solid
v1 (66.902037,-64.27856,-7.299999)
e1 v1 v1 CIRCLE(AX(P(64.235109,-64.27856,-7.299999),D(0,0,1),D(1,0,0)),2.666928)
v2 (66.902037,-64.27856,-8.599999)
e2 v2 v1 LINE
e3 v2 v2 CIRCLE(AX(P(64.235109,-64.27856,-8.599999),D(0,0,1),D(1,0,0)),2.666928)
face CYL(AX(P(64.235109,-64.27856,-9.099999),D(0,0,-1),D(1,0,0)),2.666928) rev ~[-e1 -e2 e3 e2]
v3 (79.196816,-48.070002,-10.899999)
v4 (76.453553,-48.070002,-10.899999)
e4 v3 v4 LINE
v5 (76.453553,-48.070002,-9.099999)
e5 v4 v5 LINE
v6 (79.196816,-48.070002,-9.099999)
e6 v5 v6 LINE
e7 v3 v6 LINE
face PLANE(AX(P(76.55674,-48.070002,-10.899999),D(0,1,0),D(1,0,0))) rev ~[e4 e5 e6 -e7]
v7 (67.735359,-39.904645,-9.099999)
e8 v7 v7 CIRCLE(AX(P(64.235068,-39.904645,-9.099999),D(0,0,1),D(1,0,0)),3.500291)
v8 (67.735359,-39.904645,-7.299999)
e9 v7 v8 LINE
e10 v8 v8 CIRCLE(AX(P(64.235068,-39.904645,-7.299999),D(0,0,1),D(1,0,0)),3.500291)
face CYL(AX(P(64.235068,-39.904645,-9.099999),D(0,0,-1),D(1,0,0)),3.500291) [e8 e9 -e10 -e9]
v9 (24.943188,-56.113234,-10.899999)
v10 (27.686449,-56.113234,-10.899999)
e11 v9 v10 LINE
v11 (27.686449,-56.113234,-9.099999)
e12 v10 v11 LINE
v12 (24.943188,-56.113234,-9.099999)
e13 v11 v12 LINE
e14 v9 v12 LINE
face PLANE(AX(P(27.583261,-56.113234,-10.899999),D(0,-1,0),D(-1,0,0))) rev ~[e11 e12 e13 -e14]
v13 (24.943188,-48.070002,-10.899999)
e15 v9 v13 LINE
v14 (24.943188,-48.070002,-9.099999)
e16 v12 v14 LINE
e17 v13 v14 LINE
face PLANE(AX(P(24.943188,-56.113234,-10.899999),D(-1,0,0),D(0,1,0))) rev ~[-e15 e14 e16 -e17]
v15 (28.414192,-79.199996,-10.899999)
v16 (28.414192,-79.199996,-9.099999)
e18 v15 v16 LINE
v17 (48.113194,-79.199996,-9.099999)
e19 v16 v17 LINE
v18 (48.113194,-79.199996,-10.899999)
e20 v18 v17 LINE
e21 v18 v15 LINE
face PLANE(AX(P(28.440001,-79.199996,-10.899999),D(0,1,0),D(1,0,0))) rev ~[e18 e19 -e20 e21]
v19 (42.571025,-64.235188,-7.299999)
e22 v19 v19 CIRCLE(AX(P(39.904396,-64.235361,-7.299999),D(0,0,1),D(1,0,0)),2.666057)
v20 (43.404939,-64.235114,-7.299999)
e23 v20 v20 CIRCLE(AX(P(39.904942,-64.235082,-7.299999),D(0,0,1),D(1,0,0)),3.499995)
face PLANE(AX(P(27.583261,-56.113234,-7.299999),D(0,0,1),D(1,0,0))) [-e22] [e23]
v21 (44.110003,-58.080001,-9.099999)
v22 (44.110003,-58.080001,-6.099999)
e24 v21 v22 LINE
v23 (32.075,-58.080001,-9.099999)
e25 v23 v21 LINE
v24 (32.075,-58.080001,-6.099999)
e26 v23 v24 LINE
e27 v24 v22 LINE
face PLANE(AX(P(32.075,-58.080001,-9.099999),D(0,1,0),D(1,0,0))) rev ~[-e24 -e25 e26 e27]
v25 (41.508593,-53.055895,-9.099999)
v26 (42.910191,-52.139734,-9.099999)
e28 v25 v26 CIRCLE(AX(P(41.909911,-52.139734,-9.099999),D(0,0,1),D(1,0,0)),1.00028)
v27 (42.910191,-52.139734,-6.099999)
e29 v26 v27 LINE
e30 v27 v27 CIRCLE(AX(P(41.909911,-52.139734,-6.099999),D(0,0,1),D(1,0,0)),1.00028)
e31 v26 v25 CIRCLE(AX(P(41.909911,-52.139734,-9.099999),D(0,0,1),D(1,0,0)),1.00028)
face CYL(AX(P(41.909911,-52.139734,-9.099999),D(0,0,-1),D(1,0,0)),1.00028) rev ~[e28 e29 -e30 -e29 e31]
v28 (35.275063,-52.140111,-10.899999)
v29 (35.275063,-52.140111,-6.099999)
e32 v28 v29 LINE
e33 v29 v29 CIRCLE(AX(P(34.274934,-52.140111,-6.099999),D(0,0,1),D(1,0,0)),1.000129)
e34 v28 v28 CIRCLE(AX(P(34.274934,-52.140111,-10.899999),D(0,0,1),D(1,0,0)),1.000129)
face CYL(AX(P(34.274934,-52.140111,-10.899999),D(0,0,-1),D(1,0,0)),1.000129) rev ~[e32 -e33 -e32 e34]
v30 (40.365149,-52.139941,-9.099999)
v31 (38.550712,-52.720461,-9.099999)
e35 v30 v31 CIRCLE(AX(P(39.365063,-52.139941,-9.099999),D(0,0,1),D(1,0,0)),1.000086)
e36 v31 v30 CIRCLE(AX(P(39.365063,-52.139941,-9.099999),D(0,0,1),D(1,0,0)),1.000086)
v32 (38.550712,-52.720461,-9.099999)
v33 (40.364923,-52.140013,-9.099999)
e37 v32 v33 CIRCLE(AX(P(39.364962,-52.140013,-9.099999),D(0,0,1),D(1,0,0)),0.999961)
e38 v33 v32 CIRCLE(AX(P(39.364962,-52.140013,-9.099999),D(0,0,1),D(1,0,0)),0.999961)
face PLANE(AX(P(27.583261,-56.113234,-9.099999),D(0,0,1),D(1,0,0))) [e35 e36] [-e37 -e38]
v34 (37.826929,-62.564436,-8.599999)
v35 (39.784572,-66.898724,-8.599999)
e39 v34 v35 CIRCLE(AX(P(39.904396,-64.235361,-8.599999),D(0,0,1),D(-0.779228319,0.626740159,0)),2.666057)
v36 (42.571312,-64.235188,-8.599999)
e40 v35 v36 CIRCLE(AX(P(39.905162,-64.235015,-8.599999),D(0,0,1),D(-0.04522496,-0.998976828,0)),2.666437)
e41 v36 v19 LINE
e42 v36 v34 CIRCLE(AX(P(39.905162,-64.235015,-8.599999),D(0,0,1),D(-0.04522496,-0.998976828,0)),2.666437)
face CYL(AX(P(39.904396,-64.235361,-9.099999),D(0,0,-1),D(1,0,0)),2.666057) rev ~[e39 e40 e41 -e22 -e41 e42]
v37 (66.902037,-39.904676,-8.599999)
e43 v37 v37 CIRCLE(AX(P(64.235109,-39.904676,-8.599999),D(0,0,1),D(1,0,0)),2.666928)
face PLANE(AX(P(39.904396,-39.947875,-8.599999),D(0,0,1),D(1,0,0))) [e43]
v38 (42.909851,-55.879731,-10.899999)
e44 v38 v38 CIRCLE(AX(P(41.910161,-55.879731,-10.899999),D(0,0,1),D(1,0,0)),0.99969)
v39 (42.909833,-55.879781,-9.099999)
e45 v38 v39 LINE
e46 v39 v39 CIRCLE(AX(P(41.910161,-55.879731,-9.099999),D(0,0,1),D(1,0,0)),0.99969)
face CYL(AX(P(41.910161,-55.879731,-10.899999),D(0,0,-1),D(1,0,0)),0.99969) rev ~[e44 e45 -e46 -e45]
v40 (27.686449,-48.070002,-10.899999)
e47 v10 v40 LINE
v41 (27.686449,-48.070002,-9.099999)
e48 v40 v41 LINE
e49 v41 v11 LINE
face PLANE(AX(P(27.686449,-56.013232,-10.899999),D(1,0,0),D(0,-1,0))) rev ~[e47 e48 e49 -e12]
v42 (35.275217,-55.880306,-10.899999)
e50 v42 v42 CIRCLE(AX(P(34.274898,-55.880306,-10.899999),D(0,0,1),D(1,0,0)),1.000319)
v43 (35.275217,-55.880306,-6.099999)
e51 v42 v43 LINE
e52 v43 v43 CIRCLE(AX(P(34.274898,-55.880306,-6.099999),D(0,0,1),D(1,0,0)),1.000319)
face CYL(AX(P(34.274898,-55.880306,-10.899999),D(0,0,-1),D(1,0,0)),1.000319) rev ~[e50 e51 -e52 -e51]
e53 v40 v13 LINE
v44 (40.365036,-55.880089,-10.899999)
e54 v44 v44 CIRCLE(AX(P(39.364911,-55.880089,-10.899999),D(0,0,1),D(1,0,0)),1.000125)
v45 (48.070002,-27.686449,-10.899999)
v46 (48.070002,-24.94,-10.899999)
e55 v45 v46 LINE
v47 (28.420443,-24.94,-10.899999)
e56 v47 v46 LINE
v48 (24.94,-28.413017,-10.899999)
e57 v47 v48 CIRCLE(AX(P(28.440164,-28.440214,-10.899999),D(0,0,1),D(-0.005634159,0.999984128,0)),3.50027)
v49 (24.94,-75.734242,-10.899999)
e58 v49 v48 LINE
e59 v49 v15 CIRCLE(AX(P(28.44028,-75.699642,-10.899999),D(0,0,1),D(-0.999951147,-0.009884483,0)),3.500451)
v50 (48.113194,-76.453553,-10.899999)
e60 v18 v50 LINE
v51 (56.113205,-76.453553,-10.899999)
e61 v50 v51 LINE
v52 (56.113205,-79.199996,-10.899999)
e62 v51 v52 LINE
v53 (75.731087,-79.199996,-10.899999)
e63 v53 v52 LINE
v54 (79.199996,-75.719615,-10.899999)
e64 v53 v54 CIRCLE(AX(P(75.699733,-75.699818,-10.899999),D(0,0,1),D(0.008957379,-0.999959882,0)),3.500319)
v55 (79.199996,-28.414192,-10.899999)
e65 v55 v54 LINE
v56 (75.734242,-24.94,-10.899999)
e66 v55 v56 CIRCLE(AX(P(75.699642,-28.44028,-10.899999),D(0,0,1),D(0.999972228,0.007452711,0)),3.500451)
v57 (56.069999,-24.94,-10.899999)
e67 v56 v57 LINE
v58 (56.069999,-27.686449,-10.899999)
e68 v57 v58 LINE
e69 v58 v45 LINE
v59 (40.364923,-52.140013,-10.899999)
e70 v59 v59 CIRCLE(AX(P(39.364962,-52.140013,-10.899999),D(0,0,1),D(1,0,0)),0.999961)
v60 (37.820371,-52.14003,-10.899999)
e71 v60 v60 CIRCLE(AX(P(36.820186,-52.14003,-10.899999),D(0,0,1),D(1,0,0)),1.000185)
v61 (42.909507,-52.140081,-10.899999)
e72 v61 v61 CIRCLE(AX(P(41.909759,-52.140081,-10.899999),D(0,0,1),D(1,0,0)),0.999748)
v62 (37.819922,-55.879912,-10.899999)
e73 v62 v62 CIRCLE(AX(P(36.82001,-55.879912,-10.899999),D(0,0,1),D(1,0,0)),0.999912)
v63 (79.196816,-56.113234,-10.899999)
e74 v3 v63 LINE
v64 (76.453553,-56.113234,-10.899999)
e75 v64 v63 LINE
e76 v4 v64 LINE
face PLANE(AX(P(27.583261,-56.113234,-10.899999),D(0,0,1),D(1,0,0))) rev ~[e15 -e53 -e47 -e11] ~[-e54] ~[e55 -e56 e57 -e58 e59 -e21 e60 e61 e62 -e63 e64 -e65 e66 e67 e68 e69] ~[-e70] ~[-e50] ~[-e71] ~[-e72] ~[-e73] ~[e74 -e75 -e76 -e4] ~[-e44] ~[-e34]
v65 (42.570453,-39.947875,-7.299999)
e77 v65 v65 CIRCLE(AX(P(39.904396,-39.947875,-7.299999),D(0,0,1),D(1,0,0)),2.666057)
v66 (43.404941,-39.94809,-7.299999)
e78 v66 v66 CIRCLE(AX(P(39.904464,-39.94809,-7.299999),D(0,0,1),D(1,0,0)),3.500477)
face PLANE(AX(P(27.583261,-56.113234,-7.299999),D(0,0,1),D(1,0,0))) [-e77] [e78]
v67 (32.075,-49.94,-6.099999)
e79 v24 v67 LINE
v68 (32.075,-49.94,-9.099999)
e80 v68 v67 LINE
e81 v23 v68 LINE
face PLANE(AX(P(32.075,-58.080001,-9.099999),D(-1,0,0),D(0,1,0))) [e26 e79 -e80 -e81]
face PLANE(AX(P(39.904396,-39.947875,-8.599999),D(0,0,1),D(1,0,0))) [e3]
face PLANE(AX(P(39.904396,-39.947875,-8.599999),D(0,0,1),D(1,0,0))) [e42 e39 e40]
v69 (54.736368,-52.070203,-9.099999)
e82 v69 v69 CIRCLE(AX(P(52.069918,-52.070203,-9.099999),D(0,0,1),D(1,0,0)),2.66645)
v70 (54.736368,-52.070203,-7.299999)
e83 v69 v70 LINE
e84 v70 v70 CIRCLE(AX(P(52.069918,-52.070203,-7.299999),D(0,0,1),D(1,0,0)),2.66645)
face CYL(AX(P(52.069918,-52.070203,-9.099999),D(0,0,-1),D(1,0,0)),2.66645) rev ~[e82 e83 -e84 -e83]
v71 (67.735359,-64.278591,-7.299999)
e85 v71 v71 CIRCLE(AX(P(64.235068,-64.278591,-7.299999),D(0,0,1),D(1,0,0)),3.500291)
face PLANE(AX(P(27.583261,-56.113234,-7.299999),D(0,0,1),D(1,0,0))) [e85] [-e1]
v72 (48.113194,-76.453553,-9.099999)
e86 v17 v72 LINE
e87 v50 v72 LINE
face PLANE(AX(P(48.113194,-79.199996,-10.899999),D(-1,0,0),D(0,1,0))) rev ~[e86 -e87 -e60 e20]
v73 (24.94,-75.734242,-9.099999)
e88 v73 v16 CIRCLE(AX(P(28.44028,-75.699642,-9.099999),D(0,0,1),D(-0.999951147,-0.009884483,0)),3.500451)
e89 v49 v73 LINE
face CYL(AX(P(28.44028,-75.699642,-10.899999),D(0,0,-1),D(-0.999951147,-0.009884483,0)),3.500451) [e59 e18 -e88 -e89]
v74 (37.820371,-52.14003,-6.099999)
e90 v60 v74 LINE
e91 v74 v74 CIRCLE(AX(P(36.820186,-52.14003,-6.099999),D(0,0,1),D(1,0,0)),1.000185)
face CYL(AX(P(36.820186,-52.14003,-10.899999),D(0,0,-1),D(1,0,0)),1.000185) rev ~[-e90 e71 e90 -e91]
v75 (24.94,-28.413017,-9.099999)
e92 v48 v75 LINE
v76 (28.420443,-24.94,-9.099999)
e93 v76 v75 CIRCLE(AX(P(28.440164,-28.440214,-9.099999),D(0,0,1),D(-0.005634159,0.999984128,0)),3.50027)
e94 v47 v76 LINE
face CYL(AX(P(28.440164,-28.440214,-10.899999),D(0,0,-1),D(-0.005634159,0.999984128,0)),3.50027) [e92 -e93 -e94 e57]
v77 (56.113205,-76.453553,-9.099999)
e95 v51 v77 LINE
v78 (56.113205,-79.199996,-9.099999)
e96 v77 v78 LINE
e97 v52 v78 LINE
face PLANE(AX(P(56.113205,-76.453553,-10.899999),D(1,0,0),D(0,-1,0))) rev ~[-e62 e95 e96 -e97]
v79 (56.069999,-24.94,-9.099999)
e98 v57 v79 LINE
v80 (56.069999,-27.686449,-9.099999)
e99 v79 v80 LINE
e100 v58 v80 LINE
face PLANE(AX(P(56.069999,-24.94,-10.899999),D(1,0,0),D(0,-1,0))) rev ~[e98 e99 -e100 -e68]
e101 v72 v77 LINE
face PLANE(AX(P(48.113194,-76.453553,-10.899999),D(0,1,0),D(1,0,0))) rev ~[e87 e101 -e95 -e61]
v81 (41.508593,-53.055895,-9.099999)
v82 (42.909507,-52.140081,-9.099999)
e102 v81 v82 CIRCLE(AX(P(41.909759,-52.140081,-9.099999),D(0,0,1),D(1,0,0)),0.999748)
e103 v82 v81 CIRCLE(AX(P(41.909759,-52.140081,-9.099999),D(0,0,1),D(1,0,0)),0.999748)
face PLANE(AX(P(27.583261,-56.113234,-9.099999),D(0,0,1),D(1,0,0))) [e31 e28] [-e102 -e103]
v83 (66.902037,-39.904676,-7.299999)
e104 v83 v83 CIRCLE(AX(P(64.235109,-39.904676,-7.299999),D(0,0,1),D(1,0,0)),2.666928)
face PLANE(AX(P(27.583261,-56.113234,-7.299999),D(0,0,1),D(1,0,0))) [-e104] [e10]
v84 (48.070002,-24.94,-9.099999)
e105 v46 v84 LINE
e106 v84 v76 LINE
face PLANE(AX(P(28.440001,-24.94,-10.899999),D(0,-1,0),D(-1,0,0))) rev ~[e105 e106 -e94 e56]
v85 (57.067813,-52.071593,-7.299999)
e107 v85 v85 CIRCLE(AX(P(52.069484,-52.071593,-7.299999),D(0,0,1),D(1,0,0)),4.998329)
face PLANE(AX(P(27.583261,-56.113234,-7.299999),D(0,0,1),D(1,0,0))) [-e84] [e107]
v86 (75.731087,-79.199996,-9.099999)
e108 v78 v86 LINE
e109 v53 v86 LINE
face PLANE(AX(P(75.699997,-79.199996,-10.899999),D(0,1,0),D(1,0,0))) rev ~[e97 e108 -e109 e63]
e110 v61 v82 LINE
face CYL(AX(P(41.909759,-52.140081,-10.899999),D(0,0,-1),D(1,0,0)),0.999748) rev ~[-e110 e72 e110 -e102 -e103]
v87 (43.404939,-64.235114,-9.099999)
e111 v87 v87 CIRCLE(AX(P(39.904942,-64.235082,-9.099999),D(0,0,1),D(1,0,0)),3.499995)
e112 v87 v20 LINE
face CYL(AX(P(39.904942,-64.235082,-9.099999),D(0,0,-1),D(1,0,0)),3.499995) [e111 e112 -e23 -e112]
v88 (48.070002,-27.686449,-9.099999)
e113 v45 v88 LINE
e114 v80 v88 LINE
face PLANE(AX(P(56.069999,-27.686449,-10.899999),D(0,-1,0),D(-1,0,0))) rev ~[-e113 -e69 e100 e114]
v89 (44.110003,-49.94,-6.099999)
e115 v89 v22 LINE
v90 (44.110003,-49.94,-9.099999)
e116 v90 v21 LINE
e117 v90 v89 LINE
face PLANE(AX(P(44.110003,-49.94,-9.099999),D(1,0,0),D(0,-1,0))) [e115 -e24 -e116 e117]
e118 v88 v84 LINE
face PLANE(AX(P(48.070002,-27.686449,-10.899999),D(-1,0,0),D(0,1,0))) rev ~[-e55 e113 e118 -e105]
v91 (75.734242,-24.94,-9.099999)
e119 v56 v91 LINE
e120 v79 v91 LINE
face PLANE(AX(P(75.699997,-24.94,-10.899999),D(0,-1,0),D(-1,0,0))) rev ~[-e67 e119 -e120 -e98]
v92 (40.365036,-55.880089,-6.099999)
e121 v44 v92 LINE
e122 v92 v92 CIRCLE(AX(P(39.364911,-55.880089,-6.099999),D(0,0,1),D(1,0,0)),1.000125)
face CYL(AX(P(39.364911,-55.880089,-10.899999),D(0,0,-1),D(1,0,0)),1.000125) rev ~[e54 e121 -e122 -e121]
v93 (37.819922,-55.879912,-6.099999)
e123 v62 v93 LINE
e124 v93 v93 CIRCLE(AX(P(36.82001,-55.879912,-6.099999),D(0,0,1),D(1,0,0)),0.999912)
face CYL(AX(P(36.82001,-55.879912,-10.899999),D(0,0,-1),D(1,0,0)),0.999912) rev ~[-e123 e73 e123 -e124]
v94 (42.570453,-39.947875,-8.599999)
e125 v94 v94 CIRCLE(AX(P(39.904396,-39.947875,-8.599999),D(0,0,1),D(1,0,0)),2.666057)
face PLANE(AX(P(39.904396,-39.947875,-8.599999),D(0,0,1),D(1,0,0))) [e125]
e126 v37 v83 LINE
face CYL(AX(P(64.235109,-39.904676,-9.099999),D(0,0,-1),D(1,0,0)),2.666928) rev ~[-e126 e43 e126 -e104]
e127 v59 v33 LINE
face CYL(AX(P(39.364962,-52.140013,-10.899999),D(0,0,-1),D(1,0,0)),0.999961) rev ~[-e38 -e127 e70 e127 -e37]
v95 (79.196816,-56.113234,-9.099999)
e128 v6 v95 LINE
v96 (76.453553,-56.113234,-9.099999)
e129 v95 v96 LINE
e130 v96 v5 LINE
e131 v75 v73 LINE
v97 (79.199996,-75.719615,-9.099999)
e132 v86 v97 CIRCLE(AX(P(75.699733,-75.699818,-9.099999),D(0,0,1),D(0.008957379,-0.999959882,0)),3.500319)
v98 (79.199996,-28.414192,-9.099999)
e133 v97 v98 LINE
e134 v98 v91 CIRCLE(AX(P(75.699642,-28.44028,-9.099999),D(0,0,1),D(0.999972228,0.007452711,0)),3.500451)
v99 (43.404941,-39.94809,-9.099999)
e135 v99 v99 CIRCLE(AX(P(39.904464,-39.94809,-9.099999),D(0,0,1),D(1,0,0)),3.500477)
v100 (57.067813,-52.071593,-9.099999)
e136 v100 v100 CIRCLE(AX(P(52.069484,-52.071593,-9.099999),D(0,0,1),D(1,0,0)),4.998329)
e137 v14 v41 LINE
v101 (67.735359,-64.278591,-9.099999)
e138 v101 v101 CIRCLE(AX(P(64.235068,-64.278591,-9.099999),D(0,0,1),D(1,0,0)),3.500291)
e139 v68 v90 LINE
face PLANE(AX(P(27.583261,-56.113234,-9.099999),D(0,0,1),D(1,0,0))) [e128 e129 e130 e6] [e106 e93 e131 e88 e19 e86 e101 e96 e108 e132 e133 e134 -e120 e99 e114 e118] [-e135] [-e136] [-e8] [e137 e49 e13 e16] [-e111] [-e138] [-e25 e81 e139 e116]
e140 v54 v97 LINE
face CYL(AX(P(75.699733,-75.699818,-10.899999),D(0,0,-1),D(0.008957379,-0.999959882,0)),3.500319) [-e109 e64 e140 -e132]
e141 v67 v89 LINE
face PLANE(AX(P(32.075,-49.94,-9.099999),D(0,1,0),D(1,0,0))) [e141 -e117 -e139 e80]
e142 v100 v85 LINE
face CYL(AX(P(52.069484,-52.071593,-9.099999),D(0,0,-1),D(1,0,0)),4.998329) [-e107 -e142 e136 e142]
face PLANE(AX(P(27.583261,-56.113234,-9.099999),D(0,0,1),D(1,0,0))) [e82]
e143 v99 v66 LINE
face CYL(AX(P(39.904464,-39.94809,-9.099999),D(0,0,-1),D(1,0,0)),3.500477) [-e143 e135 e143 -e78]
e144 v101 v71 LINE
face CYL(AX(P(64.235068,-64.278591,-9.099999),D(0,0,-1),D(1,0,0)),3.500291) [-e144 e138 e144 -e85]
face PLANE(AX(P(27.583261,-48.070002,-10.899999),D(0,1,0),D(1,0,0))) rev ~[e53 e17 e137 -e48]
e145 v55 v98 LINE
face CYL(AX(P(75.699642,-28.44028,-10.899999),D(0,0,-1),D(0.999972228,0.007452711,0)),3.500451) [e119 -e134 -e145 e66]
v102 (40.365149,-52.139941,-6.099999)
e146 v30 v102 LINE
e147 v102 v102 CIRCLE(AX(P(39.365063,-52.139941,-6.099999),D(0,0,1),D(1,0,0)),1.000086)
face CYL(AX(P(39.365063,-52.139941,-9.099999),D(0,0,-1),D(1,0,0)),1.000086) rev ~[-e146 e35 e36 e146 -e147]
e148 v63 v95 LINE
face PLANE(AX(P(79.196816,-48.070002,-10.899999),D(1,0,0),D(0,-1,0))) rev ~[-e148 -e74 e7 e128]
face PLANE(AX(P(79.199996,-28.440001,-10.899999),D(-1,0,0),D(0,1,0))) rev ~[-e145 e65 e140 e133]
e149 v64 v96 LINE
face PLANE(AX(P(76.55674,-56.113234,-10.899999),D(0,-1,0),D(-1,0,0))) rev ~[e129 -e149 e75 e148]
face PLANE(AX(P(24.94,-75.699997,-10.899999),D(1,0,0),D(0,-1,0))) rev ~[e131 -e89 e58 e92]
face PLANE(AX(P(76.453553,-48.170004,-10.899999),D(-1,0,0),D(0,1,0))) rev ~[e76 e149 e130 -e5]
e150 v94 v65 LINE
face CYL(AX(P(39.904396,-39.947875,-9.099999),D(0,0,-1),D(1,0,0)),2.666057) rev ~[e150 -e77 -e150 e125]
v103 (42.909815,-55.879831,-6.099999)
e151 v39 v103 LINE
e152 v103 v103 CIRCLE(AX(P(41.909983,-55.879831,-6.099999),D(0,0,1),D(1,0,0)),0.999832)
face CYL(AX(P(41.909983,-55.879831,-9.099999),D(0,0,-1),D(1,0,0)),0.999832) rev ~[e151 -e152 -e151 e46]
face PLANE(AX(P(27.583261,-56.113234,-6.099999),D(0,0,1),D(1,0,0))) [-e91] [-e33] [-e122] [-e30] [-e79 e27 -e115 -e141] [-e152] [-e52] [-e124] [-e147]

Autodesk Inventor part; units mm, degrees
sketch "Skizze1" plane through (27.583261, -56.113234, -10.899999) normal (0, 0, 1) x (1, 0, 0)
  line L0 (20.486741, 28.426785) -> (20.486741, 31.173234)
  line L1 (28.486738, 28.426785) -> (20.486741, 28.426785)
  line L2 (28.486738, 31.173234) -> (28.486738, 28.426785)
  circle A0 centre (48.116381, 27.672954) radius 3.500451
  line L3 (48.870292, 0.100002) -> (48.870292, 7.94323)
  line L4 (48.973479, 8.043232) -> (51.613555, 8.043232)
  line L5 (51.613555, 0) -> (48.973479, 0)
  circle A1 centre (48.116472, -19.586583) radius 3.50032
  line L6 (20.529933, -20.340319) -> (28.529944, -20.340319)
  line L7 (28.529944, -20.340319) -> (28.529944, -23.086762)
  line L8 (20.529933, -23.086762) -> (20.529933, -20.340319)
  circle A2 centre (0.857019, -19.586408) radius 3.500451
  line L9 (0.103188, 7.94323) -> (0.103188, 0.100002)
  line L10 (-2.640073, 8.043232) -> (0, 8.043232)
  line L11 (0, 0) -> (-2.640073, 0)
  circle A3 centre (0.856903, 27.67302) radius 3.50027
  circle A4 centre (6.691673, 3.973123) radius 1.000129
  circle A5 centre (9.236925, 3.973204) radius 1.000185
  circle A6 centre (11.781701, 3.973221) radius 0.999961
  circle A7 centre (14.326498, 3.973153) radius 0.999748
  circle A8 centre (14.3269, 0.233503) radius 0.99969
  circle A9 centre (11.78165, 0.233145) radius 1.000125
  circle A10 centre (9.236749, 0.233322) radius 0.999912
  circle A11 centre (6.691637, 0.232928) radius 1.000319
  line L12 (-2.640073, 8.043232) -> (0.103188, 8.043232)
  line L13 (0.103188, 8.043232) -> (0.103188, 0)
  line L14 (0.103188, 0) -> (-2.640073, 0)
  line L15 (20.486741, 31.173234) -> (20.486741, 28.426785)
  line L16 (28.486738, 28.426785) -> (28.486738, 31.173234)
  line L17 (48.116736, 31.173234) -> (28.486738, 31.173234)
  line L18 (0.85674, -23.086762) -> (20.529933, -23.086762)
  line L19 (-2.643261, 0.100002) -> (-2.643261, -19.586763)
  line L20 (51.616735, -19.586763) -> (51.616735, 0.100002)
  line L21 (-2.643261, 27.673233) -> (-2.643261, 7.94323)
  line L22 (20.486741, 31.173234) -> (0.85674, 31.173234)
  line L23 (51.616735, 7.94323) -> (51.616735, 27.673233)
  line L24 (28.529944, -23.086762) -> (48.116736, -23.086762)
  line L25 (-2.643261, -23.086762) -> (51.616735, -23.086762)
  line L26 (51.616735, -23.086762) -> (51.616735, 31.173234)
  line L27 (51.616735, 31.173234) -> (-2.643261, 31.173234)
  line L28 (-2.643261, 31.173234) -> (-2.643261, -23.086762)
  line L29 (51.613555, 8.043232) -> (48.870292, 8.043232)
  line L30 (48.870292, 8.043232) -> (48.870292, 0)
  line L31 (48.870292, 0) -> (51.613555, 0)
  line L32 (48.870292, 0) -> (51.613555, 0)
  line L33 (48.870292, 0) -> (48.870292, 8.043232)
  line L34 (51.613555, 8.043232) -> (48.870292, 8.043232)
  line L35 (48.870292, 8.043232) -> (48.870292, 0)
  line L36 (48.870292, 0) -> (51.613555, 0)
  line L37 (51.613555, 0) -> (51.613555, 8.043232)
  line L38 (0.103188, 0) -> (-2.640073, 0)
  line L39 (-2.640073, 8.043232) -> (0.103188, 8.043232)
  line L40 (0.103188, 0) -> (-2.640073, 0)
  line L41 (-2.640073, 0) -> (-2.640073, 8.043232)
  line L42 (-2.640073, 8.043232) -> (0.103188, 8.043232)
  line L43 (0.103188, 8.043232) -> (0.103188, 0)
  point P0 (-27.583261, 56.113234)
  point P1 (0.837182, 31.173234)
  point P2 (-2.643261, 27.700217)
  point P3 (-2.643261, -19.621008)
  point P4 (0.830931, -23.086762)
  point P5 (48.147826, -23.086762)
  point P6 (51.616735, -19.606381)
  point P7 (51.616735, 27.699042)
  point P8 (48.150981, 31.173234)
sketch "Skizze1 outline for Extrusion2" plane through (27.583261, -56.113234, -10.899999) normal (0, 0, 1) x (1, 0, 0)
  line L0 (28.486738, 28.426785) -> (20.486741, 28.426785)
  line L1 (28.486738, 31.173234) -> (28.486738, 28.426785)
  line L2 (20.486741, 28.426785) -> (20.486741, 31.173234)
  line L3 (48.116736, 31.173234) -> (28.486738, 31.173234)
  line L4 (20.486741, 31.173234) -> (0.85674, 31.173234)
  line L5 (48.150981, 31.173234) -> (48.116736, 31.173234)
  line L6 (0.85674, 31.173234) -> (0.837182, 31.173234)
  arc A0 (51.616735, 27.699042) -> (48.150981, 31.173234) centre (48.116381, 27.672954) ccw
  arc A1 (0.837182, 31.173234) -> (-2.643261, 27.700217) centre (0.856903, 27.67302) ccw
  line L7 (51.616735, 27.673233) -> (51.616735, 27.699042)
  line L8 (-2.643261, 27.700217) -> (-2.643261, 27.673233)
  line L9 (51.616735, 7.94323) -> (51.616735, 27.673233)
  line L10 (-2.643261, 27.673233) -> (-2.643261, 7.94323)
  line L11 (51.616735, 0.100002) -> (51.616735, 7.94323)
  line L12 (-2.643261, 7.94323) -> (-2.643261, 0.100002)
  line L13 (51.616735, -19.586763) -> (51.616735, 0.100002)
  line L14 (-2.643261, 0.100002) -> (-2.643261, -19.586763)
  line L15 (51.616735, -19.606381) -> (51.616735, -19.586763)
  line L16 (-2.643261, -19.586763) -> (-2.643261, -19.621008)
  arc A2 (48.147826, -23.086762) -> (51.616735, -19.606381) centre (48.116472, -19.586583) ccw
  arc A3 (-2.643261, -19.621008) -> (0.830931, -23.086762) centre (0.857019, -19.586408) ccw
  line L17 (48.116736, -23.086762) -> (48.147826, -23.086762)
  line L18 (0.830931, -23.086762) -> (0.85674, -23.086762)
  line L19 (28.529944, -23.086762) -> (48.116736, -23.086762)
  line L20 (0.85674, -23.086762) -> (20.529933, -23.086762)
  line L21 (28.529944, -20.340319) -> (28.529944, -23.086762)
  line L22 (20.529933, -23.086762) -> (20.529933, -20.340319)
  line L23 (20.529933, -20.340319) -> (28.529944, -20.340319)
  circle A4 centre (6.691637, 0.232928) radius 1.000319
  circle A5 centre (9.236749, 0.233322) radius 0.999912
  circle A6 centre (11.78165, 0.233145) radius 1.000125
  circle A7 centre (14.3269, 0.233503) radius 0.99969
  line L24 (-2.640073, 0) -> (-2.640073, 8.043232)
  line L25 (0, 0) -> (-2.640073, 0)
  line L26 (0.103188, 0) -> (0, 0)
  line L27 (0.103188, 0.100002) -> (0.103188, 0)
  line L28 (0.103188, 7.94323) -> (0.103188, 0.100002)
  line L29 (0.103188, 8.043232) -> (0.103188, 7.94323)
  line L30 (0, 8.043232) -> (0.103188, 8.043232)
  line L31 (-2.640073, 8.043232) -> (0, 8.043232)
  circle A8 centre (6.691673, 3.973123) radius 1.000129
  circle A9 centre (9.236925, 3.973204) radius 1.000185
  circle A10 centre (11.781701, 3.973221) radius 0.999961
  circle A11 centre (14.326498, 3.973153) radius 0.999748
  line L32 (51.613555, 8.043232) -> (51.613555, 0)
  line L33 (48.973479, 8.043232) -> (51.613555, 8.043232)
  line L34 (48.870292, 8.043232) -> (48.973479, 8.043232)
  line L35 (48.870292, 7.94323) -> (48.870292, 8.043232)
  line L36 (48.870292, 0.100002) -> (48.870292, 7.94323)
  line L37 (48.870292, 0) -> (48.870292, 0.100002)
  line L38 (48.973479, 0) -> (48.870292, 0)
  line L39 (51.613555, 0) -> (48.973479, 0)
extrude "Extrusion2" add sketch "Skizze1 outline for Extrusion2" along normal blind 1.8
sketch "Skizze2" plane through (27.583261, -56.113234, -9.099999) normal (0, 0, 1) x (1, 0, 0)
  line L0 (4.491739, -1.966767) -> (16.526742, -1.966767)
  line L1 (4.491739, -1.966767) -> (4.491739, 6.173234)
  line L2 (16.526742, 6.173234) -> (16.526742, -1.966767)
  line L3 (4.491739, 6.173234) -> (16.526742, 6.173234)
  line L4 (16.526742, -1.966767) -> (4.491739, -1.966767)
  circle A0 centre (9.236925, 3.973204) radius 1.000185
  circle A1 centre (11.781802, 3.973293) radius 1.000086
  circle A2 centre (14.32665, 3.9735) radius 1.00028
  circle A3 centre (14.326722, 0.233403) radius 0.999832
  circle A4 centre (11.78165, 0.233145) radius 1.000125
  circle A5 centre (9.236749, 0.233322) radius 0.999912
  circle A6 centre (6.691673, 3.973123) radius 1.000129
  circle A7 centre (6.691637, 0.232928) radius 1.000319
  point P0 (-27.583261, 56.113234)
extrude "Extrusion3" add sketch "Skizze2" along normal blind 3
sketch "Skizze3" plane through (27.583261, -56.113234, -9.099999) normal (0, 0, 1) x (1, 0, 0)
  circle A0 centre (12.321135, -8.122127) radius 2.666057
  circle A1 centre (12.321681, -8.121848) radius 3.499995
  circle A2 centre (12.3219, -8.121781) radius 2.666437
  circle A3 centre (12.321203, -8.121912) radius 3.500477
  circle A4 centre (24.486223, 4.041641) radius 4.998329
  circle A5 centre (24.486657, 4.043031) radius 2.66645
  circle A6 centre (36.651848, 16.208558) radius 2.666928
  circle A7 centre (36.651807, 16.208589) radius 3.500291
  line L0 (51.613555, 8.043232) -> (51.613555, 0)
  line L1 (51.613555, 4.021616) -> (-2.640073, 4.021616) construction
  line L2 (-2.640073, 0) -> (-2.640073, 8.043232)
  circle A8 centre (12.321135, 16.165359) radius 2.666057
  circle A9 centre (12.321203, 16.165144) radius 3.500477
  circle A10 centre (36.651848, -8.165326) radius 2.666928
  circle A11 centre (36.651807, -8.165357) radius 3.500291
  point P0 (-27.583261, 56.113234)
  point P1 (10.243668, -6.451202)
  point P2 (12.201311, -10.78549)
extrude "Extrusion4" add sketch "Skizze3" along normal blind 1.8
sketch "Skizze4" plane through (27.583261, -56.113234, -9.099999) normal (0, 0, 1) x (1, 0, 0)
  line L0 (51.616735, -19.606381) -> (51.616735, 27.699042) construction
  line L1 (51.616735, 4.04633) -> (-2.640073, 4.021616) construction
  line L2 (-2.640073, 0) -> (-2.640073, 8.043232) construction
  circle A0 centre (36.651848, 16.208558) radius 2.666928 construction
  circle A1 centre (36.651807, 16.208589) radius 3.500291 construction
  circle A2 centre (12.321681, -8.121848) radius 3.499995 construction
  arc A3 (12.201311, -10.78549) -> (10.243668, -6.451202) centre (12.3219, -8.121781) ccw construction
  arc A4 (10.243668, -6.451202) -> (12.201311, -10.78549) centre (12.321135, -8.122127) ccw construction
  circle A5 centre (24.486657, 4.043031) radius 2.66645 construction
  circle A6 centre (36.651848, 16.208558) radius 2.666928 construction
  arc A7 (10.243668, -6.451202) -> (12.201311, -10.78549) centre (12.321135, -8.122127) ccw construction
  arc A8 (12.201311, -10.78549) -> (10.243668, -6.451202) centre (12.3219, -8.121781) ccw construction
  point P0 (-27.583261, 56.113234)
sketch "Skizze5" plane through (39.904396, -39.947875, -9.099999) normal (0, 0, 1) x (1, 0, 0)
  circle A0 centre (0, 0) radius 2.666057
  circle A1 centre (24.330713, 0.043199) radius 2.666928
  circle A2 centre (24.330713, -24.330685) radius 2.666928
  arc A3 (-2.077467, -22.616561) -> (-0.119824, -26.950849) centre (0, -24.287486) ccw
  arc A4 (-0.119824, -26.950849) -> (-2.077467, -22.616561) centre (0.000765, -24.28714) ccw
  point P0 (-39.904396, 39.947875)
extrude "Extrusion5" add sketch "Skizze5" along normal blind 0.5
properties part number "brick_bottom_standard_block-0.5_circle-0,4"
